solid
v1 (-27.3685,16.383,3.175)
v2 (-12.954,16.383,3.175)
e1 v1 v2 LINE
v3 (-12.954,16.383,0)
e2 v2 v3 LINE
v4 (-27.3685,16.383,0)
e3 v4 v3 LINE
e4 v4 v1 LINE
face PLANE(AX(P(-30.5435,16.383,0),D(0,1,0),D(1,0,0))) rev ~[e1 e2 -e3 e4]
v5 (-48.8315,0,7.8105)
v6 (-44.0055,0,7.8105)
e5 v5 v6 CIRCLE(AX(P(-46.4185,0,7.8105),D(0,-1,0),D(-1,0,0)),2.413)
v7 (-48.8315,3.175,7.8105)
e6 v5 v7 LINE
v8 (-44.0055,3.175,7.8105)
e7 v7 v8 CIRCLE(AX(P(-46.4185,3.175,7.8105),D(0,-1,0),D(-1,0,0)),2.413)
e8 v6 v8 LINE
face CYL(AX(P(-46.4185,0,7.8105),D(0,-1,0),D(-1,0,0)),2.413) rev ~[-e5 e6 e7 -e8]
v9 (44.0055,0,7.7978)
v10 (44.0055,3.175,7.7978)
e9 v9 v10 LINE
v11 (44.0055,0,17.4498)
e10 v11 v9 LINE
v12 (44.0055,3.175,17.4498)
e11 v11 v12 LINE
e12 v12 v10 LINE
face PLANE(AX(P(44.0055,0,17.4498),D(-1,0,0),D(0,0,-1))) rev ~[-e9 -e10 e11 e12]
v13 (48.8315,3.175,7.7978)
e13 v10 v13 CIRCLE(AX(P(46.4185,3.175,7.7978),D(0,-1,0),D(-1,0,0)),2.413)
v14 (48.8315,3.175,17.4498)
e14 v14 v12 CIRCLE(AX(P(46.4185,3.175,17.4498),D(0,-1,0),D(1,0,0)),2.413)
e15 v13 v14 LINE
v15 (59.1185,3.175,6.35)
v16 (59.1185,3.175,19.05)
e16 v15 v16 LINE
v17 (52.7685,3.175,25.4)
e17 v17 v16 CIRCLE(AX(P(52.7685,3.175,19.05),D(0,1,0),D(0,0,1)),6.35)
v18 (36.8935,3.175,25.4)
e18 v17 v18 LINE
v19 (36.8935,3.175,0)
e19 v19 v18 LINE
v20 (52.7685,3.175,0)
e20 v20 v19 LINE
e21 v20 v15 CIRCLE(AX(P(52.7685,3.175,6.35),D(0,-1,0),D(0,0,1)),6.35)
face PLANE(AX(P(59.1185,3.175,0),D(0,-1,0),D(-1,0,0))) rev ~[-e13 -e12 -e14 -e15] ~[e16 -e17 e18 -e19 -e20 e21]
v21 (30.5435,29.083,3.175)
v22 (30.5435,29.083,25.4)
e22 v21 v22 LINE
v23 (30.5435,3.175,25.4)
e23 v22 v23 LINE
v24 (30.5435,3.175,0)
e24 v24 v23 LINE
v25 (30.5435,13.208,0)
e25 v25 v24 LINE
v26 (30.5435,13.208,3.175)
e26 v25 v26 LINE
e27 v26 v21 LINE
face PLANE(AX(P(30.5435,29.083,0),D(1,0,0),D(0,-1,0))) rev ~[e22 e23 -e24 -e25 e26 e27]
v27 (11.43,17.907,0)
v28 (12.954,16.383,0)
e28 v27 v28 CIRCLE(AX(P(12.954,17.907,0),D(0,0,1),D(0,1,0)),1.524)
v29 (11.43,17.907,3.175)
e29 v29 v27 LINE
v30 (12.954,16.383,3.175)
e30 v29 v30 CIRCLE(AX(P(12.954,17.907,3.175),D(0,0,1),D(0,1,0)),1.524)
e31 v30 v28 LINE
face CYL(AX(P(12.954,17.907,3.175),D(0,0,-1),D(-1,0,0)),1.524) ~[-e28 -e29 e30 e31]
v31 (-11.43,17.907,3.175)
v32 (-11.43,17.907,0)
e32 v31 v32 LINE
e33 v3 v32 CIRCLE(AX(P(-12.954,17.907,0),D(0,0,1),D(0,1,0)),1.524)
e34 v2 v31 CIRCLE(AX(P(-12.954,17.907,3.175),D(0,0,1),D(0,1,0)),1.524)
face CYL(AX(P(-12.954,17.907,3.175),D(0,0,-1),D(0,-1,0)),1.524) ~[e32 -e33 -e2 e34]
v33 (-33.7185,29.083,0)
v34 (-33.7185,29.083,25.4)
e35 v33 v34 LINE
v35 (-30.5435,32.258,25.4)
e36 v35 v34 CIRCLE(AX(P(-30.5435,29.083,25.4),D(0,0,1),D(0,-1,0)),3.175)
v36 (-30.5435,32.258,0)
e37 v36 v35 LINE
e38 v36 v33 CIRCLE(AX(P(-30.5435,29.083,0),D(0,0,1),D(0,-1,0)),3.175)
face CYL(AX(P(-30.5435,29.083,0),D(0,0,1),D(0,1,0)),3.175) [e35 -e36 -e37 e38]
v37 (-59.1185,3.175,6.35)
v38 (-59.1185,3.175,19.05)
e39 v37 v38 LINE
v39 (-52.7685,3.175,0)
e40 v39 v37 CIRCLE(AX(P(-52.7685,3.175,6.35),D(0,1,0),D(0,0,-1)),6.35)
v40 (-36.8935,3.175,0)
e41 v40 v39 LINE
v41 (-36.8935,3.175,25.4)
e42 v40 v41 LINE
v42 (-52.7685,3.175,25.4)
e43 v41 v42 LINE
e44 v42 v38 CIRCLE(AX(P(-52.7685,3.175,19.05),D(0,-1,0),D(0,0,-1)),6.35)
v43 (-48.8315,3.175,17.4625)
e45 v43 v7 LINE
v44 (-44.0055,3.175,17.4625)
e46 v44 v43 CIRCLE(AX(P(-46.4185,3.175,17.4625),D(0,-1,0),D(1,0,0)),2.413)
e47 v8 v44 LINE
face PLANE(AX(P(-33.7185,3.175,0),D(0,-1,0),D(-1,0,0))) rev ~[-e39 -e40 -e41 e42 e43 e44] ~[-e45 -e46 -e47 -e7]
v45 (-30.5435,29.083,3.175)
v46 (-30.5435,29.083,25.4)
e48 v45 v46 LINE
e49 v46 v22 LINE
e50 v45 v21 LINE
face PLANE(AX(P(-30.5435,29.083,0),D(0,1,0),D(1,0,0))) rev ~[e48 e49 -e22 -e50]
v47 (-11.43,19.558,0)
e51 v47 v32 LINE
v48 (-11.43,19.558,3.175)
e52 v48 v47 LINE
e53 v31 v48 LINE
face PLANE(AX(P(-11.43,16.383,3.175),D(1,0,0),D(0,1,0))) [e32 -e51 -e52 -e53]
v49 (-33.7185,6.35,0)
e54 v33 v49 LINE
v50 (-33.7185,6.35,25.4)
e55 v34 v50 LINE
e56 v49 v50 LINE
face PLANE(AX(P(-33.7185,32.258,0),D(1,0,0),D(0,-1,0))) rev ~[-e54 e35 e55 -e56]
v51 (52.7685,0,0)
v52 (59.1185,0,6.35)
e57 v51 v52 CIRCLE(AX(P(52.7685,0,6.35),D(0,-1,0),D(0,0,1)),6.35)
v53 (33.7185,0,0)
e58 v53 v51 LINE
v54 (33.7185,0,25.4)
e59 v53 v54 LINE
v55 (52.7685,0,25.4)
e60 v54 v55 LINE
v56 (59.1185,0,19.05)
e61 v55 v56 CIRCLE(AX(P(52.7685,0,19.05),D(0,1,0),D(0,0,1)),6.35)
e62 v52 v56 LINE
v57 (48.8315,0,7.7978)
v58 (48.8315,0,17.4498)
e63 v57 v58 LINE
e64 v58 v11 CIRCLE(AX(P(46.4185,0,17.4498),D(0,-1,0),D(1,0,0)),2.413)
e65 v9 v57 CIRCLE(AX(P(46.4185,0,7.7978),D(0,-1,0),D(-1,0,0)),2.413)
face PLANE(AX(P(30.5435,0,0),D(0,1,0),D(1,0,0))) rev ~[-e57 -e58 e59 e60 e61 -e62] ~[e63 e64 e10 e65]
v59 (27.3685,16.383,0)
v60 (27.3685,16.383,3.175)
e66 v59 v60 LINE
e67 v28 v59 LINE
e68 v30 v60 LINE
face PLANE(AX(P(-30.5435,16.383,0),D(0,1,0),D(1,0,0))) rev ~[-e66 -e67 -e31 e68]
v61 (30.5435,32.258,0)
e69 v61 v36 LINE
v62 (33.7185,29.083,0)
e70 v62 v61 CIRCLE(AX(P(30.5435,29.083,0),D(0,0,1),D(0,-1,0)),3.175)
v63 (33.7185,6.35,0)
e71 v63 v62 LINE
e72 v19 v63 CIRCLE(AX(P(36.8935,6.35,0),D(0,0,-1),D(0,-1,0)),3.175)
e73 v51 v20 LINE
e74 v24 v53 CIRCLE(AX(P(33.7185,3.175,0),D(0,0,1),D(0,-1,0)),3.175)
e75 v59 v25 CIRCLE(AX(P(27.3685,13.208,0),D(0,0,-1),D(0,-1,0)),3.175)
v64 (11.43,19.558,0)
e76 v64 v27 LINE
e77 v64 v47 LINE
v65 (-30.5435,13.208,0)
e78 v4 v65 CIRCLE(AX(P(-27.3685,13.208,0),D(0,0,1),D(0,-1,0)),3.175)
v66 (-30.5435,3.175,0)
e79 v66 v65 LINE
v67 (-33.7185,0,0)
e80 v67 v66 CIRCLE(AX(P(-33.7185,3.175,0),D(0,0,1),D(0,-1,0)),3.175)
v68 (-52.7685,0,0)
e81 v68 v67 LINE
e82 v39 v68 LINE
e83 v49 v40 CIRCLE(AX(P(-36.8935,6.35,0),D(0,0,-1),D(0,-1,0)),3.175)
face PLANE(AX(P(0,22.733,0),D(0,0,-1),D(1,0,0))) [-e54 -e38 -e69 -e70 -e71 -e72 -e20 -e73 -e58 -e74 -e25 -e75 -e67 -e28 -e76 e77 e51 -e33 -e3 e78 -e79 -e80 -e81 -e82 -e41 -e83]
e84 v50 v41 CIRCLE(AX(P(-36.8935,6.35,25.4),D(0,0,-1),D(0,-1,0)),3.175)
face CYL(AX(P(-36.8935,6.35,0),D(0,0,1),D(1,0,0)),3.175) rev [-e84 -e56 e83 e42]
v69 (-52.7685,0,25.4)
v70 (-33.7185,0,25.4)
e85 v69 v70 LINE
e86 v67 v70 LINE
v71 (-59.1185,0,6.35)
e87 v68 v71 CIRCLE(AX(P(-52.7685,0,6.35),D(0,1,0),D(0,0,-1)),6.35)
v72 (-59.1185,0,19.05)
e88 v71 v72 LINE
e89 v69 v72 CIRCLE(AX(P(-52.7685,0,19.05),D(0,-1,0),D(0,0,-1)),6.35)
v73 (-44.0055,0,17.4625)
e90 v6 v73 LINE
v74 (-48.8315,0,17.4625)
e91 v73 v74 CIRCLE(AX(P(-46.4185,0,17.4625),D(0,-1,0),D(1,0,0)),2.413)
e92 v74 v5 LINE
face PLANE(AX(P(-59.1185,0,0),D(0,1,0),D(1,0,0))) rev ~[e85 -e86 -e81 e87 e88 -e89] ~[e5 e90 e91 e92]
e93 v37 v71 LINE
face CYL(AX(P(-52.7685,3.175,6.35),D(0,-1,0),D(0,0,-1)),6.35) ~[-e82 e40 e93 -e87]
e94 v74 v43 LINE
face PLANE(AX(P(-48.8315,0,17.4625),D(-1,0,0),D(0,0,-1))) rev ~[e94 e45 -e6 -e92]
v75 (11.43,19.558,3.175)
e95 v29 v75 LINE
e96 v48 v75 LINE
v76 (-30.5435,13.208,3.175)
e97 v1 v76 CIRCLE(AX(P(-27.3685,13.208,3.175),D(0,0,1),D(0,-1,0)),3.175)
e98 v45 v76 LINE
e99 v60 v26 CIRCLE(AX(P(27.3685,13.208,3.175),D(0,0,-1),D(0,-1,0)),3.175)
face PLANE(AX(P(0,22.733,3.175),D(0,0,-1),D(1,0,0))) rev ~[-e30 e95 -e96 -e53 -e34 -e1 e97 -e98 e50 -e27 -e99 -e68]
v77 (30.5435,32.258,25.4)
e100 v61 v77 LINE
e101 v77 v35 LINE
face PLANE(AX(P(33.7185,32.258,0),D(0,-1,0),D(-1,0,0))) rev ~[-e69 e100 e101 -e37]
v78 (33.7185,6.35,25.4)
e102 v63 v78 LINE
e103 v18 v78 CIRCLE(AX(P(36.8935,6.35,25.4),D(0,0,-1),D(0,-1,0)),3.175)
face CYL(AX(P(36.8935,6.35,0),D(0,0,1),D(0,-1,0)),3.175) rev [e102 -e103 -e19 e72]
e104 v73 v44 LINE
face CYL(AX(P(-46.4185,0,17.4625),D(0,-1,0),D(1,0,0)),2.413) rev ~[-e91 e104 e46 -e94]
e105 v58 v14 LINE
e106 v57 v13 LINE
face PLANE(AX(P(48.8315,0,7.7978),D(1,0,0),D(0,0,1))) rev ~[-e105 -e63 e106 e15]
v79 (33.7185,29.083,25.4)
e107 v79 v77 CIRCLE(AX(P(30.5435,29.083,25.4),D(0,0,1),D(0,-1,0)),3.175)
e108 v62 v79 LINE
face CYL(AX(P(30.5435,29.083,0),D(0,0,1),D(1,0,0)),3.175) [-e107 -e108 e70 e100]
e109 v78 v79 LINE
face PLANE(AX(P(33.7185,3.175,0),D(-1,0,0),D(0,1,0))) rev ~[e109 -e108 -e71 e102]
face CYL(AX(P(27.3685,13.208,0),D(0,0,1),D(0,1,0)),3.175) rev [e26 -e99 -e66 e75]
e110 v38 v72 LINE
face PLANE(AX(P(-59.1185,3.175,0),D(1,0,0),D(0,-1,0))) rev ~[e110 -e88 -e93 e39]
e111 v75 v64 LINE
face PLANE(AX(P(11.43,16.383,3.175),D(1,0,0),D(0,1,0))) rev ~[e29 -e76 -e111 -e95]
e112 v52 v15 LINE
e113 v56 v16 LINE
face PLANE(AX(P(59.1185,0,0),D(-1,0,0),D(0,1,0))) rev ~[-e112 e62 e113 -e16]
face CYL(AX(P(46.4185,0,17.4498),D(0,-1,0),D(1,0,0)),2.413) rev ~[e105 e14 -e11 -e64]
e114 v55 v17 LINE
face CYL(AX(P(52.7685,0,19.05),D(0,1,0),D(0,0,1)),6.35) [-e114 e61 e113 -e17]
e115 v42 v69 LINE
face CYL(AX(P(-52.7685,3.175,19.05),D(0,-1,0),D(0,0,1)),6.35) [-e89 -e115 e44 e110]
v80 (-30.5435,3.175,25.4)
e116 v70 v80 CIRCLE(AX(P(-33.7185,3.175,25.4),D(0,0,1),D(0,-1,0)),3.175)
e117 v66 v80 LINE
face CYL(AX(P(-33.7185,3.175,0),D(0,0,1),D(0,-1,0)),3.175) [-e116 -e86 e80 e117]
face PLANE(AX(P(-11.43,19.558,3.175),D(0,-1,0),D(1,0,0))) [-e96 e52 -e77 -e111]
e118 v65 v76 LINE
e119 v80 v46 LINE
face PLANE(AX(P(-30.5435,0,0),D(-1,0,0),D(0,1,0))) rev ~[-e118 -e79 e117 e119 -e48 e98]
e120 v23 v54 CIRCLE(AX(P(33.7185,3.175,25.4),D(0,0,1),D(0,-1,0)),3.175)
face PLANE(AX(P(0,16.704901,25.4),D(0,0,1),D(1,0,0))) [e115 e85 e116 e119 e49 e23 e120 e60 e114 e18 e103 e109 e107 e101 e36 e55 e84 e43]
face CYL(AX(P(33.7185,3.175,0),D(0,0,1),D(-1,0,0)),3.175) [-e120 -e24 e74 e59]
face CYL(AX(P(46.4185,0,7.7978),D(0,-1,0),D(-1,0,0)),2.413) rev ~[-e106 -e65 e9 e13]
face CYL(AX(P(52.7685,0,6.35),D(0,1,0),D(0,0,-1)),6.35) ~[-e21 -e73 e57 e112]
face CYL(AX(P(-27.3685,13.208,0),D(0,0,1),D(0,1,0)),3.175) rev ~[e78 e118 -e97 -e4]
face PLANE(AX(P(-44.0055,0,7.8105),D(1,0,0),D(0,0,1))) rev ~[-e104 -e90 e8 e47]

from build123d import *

# Parameters (mm, degrees)
F1_DEPTH  = 25.4
F2_R      = 3.175
F4_DEPTH  = 32.259
F5_R      = 6.35
F6_W      = 61.087
F6_H      = 12.7
F7_DEPTH  = 3.175
F8_R      = 3.175
F9_W      = 22.86
F9_H      = 3.175
F10_DEPTH = 25.4
F11_R     = 1.524


with BuildPart() as f1:
    # F0 (on Top) → F1 (new body)
    with BuildSketch(Plane.XY):
        Polygon((-30.5435, 29.083), (0, 29.083), (30.5435, 29.083), (30.5435, 0), (59.1185, 0), (59.1185, 3.175), (33.7185, 3.175), (33.7185, 32.258), (0, 32.258), (-33.7185, 32.258), (-33.7185, 3.175), (-59.1185, 3.175), (-59.1185, 0), (-30.5435, 0), align=None)
    extrude(amount=F1_DEPTH)

    # F2
    f2_edges = [f1.edges().sort_by_distance(p)[0] for p in [
        (-30.5435, 0, 12.7),
        (30.5435, 0, 12.7),
    ]]
    fillet(f2_edges, radius=F2_R)

    # F3 (on Front) → F4 (cut, through all)
    with BuildSketch(Plane.XZ):
        with BuildLine():
            ThreePointArc((-48.8315, 7.8105), (-46.4185, 5.3975), (-44.0055, 7.8105))
            Line((-44.0055, 7.8105), (-44.0055, 17.4625))
            ThreePointArc((-44.0055, 17.4625), (-46.4185, 19.8755), (-48.8315, 17.4625))
            Line((-48.8315, 17.4625), (-48.8315, 7.8105))
        make_face()
        with BuildLine():
            ThreePointArc((48.8315, 17.4498), (46.4185, 19.8628), (44.0055, 17.4498))
            Line((44.0055, 17.4498), (44.0055, 7.7978))
            ThreePointArc((44.0055, 7.7978), (46.4185, 5.3848), (48.8315, 7.7978))
            Line((48.8315, 7.7978), (48.8315, 17.4498))
        make_face()
    extrude(amount=-F4_DEPTH, mode=Mode.SUBTRACT)

    # F5
    f5_edges = [f1.edges().sort_by_distance(p)[0] for p in [
        (-59.1185, 1.5875, 0),
        (-59.1185, 1.5875, 25.4),
        (59.1185, 1.5875, 25.4),
        (59.1185, 1.5875, 0),
    ]]
    fillet(f5_edges, radius=F5_R)

    # F6 (on face) → F7 (join)
    with BuildSketch(Plane(origin=(0, 0, 0), x_dir=(1, 0, 0), z_dir=(0, 0, -1))):
        with Locations((0, -22.733)):
            Rectangle(F6_W, F6_H)
    extrude(amount=-F7_DEPTH)

    # F8
    f8_edges = [f1.edges().sort_by_distance(p)[0] for p in [
        (33.7185, 3.175, 12.7),
        (33.7185, 32.258, 12.7),
        (-33.7185, 32.258, 12.7),
        (-33.7185, 3.175, 12.7),
        (30.5435, 16.383, 1.5875),
        (-30.5435, 16.383, 1.5875),
    ]]
    fillet(f8_edges, radius=F8_R)

    # F9 (on face) → F10 (cut)
    with BuildSketch(Plane.XY.offset(3.175)):
        with Locations((0, 17.9705)):
            Rectangle(F9_W, F9_H)
    extrude(amount=-F10_DEPTH, mode=Mode.SUBTRACT)

    # F11
    f11_edges = [f1.edges().sort_by_distance(p)[0] for p in [
        (-11.43, 16.383, 1.5875),
        (11.43, 16.383, 1.5875),
    ]]
    fillet(f11_edges, radius=F11_R)


solid = f1.part
